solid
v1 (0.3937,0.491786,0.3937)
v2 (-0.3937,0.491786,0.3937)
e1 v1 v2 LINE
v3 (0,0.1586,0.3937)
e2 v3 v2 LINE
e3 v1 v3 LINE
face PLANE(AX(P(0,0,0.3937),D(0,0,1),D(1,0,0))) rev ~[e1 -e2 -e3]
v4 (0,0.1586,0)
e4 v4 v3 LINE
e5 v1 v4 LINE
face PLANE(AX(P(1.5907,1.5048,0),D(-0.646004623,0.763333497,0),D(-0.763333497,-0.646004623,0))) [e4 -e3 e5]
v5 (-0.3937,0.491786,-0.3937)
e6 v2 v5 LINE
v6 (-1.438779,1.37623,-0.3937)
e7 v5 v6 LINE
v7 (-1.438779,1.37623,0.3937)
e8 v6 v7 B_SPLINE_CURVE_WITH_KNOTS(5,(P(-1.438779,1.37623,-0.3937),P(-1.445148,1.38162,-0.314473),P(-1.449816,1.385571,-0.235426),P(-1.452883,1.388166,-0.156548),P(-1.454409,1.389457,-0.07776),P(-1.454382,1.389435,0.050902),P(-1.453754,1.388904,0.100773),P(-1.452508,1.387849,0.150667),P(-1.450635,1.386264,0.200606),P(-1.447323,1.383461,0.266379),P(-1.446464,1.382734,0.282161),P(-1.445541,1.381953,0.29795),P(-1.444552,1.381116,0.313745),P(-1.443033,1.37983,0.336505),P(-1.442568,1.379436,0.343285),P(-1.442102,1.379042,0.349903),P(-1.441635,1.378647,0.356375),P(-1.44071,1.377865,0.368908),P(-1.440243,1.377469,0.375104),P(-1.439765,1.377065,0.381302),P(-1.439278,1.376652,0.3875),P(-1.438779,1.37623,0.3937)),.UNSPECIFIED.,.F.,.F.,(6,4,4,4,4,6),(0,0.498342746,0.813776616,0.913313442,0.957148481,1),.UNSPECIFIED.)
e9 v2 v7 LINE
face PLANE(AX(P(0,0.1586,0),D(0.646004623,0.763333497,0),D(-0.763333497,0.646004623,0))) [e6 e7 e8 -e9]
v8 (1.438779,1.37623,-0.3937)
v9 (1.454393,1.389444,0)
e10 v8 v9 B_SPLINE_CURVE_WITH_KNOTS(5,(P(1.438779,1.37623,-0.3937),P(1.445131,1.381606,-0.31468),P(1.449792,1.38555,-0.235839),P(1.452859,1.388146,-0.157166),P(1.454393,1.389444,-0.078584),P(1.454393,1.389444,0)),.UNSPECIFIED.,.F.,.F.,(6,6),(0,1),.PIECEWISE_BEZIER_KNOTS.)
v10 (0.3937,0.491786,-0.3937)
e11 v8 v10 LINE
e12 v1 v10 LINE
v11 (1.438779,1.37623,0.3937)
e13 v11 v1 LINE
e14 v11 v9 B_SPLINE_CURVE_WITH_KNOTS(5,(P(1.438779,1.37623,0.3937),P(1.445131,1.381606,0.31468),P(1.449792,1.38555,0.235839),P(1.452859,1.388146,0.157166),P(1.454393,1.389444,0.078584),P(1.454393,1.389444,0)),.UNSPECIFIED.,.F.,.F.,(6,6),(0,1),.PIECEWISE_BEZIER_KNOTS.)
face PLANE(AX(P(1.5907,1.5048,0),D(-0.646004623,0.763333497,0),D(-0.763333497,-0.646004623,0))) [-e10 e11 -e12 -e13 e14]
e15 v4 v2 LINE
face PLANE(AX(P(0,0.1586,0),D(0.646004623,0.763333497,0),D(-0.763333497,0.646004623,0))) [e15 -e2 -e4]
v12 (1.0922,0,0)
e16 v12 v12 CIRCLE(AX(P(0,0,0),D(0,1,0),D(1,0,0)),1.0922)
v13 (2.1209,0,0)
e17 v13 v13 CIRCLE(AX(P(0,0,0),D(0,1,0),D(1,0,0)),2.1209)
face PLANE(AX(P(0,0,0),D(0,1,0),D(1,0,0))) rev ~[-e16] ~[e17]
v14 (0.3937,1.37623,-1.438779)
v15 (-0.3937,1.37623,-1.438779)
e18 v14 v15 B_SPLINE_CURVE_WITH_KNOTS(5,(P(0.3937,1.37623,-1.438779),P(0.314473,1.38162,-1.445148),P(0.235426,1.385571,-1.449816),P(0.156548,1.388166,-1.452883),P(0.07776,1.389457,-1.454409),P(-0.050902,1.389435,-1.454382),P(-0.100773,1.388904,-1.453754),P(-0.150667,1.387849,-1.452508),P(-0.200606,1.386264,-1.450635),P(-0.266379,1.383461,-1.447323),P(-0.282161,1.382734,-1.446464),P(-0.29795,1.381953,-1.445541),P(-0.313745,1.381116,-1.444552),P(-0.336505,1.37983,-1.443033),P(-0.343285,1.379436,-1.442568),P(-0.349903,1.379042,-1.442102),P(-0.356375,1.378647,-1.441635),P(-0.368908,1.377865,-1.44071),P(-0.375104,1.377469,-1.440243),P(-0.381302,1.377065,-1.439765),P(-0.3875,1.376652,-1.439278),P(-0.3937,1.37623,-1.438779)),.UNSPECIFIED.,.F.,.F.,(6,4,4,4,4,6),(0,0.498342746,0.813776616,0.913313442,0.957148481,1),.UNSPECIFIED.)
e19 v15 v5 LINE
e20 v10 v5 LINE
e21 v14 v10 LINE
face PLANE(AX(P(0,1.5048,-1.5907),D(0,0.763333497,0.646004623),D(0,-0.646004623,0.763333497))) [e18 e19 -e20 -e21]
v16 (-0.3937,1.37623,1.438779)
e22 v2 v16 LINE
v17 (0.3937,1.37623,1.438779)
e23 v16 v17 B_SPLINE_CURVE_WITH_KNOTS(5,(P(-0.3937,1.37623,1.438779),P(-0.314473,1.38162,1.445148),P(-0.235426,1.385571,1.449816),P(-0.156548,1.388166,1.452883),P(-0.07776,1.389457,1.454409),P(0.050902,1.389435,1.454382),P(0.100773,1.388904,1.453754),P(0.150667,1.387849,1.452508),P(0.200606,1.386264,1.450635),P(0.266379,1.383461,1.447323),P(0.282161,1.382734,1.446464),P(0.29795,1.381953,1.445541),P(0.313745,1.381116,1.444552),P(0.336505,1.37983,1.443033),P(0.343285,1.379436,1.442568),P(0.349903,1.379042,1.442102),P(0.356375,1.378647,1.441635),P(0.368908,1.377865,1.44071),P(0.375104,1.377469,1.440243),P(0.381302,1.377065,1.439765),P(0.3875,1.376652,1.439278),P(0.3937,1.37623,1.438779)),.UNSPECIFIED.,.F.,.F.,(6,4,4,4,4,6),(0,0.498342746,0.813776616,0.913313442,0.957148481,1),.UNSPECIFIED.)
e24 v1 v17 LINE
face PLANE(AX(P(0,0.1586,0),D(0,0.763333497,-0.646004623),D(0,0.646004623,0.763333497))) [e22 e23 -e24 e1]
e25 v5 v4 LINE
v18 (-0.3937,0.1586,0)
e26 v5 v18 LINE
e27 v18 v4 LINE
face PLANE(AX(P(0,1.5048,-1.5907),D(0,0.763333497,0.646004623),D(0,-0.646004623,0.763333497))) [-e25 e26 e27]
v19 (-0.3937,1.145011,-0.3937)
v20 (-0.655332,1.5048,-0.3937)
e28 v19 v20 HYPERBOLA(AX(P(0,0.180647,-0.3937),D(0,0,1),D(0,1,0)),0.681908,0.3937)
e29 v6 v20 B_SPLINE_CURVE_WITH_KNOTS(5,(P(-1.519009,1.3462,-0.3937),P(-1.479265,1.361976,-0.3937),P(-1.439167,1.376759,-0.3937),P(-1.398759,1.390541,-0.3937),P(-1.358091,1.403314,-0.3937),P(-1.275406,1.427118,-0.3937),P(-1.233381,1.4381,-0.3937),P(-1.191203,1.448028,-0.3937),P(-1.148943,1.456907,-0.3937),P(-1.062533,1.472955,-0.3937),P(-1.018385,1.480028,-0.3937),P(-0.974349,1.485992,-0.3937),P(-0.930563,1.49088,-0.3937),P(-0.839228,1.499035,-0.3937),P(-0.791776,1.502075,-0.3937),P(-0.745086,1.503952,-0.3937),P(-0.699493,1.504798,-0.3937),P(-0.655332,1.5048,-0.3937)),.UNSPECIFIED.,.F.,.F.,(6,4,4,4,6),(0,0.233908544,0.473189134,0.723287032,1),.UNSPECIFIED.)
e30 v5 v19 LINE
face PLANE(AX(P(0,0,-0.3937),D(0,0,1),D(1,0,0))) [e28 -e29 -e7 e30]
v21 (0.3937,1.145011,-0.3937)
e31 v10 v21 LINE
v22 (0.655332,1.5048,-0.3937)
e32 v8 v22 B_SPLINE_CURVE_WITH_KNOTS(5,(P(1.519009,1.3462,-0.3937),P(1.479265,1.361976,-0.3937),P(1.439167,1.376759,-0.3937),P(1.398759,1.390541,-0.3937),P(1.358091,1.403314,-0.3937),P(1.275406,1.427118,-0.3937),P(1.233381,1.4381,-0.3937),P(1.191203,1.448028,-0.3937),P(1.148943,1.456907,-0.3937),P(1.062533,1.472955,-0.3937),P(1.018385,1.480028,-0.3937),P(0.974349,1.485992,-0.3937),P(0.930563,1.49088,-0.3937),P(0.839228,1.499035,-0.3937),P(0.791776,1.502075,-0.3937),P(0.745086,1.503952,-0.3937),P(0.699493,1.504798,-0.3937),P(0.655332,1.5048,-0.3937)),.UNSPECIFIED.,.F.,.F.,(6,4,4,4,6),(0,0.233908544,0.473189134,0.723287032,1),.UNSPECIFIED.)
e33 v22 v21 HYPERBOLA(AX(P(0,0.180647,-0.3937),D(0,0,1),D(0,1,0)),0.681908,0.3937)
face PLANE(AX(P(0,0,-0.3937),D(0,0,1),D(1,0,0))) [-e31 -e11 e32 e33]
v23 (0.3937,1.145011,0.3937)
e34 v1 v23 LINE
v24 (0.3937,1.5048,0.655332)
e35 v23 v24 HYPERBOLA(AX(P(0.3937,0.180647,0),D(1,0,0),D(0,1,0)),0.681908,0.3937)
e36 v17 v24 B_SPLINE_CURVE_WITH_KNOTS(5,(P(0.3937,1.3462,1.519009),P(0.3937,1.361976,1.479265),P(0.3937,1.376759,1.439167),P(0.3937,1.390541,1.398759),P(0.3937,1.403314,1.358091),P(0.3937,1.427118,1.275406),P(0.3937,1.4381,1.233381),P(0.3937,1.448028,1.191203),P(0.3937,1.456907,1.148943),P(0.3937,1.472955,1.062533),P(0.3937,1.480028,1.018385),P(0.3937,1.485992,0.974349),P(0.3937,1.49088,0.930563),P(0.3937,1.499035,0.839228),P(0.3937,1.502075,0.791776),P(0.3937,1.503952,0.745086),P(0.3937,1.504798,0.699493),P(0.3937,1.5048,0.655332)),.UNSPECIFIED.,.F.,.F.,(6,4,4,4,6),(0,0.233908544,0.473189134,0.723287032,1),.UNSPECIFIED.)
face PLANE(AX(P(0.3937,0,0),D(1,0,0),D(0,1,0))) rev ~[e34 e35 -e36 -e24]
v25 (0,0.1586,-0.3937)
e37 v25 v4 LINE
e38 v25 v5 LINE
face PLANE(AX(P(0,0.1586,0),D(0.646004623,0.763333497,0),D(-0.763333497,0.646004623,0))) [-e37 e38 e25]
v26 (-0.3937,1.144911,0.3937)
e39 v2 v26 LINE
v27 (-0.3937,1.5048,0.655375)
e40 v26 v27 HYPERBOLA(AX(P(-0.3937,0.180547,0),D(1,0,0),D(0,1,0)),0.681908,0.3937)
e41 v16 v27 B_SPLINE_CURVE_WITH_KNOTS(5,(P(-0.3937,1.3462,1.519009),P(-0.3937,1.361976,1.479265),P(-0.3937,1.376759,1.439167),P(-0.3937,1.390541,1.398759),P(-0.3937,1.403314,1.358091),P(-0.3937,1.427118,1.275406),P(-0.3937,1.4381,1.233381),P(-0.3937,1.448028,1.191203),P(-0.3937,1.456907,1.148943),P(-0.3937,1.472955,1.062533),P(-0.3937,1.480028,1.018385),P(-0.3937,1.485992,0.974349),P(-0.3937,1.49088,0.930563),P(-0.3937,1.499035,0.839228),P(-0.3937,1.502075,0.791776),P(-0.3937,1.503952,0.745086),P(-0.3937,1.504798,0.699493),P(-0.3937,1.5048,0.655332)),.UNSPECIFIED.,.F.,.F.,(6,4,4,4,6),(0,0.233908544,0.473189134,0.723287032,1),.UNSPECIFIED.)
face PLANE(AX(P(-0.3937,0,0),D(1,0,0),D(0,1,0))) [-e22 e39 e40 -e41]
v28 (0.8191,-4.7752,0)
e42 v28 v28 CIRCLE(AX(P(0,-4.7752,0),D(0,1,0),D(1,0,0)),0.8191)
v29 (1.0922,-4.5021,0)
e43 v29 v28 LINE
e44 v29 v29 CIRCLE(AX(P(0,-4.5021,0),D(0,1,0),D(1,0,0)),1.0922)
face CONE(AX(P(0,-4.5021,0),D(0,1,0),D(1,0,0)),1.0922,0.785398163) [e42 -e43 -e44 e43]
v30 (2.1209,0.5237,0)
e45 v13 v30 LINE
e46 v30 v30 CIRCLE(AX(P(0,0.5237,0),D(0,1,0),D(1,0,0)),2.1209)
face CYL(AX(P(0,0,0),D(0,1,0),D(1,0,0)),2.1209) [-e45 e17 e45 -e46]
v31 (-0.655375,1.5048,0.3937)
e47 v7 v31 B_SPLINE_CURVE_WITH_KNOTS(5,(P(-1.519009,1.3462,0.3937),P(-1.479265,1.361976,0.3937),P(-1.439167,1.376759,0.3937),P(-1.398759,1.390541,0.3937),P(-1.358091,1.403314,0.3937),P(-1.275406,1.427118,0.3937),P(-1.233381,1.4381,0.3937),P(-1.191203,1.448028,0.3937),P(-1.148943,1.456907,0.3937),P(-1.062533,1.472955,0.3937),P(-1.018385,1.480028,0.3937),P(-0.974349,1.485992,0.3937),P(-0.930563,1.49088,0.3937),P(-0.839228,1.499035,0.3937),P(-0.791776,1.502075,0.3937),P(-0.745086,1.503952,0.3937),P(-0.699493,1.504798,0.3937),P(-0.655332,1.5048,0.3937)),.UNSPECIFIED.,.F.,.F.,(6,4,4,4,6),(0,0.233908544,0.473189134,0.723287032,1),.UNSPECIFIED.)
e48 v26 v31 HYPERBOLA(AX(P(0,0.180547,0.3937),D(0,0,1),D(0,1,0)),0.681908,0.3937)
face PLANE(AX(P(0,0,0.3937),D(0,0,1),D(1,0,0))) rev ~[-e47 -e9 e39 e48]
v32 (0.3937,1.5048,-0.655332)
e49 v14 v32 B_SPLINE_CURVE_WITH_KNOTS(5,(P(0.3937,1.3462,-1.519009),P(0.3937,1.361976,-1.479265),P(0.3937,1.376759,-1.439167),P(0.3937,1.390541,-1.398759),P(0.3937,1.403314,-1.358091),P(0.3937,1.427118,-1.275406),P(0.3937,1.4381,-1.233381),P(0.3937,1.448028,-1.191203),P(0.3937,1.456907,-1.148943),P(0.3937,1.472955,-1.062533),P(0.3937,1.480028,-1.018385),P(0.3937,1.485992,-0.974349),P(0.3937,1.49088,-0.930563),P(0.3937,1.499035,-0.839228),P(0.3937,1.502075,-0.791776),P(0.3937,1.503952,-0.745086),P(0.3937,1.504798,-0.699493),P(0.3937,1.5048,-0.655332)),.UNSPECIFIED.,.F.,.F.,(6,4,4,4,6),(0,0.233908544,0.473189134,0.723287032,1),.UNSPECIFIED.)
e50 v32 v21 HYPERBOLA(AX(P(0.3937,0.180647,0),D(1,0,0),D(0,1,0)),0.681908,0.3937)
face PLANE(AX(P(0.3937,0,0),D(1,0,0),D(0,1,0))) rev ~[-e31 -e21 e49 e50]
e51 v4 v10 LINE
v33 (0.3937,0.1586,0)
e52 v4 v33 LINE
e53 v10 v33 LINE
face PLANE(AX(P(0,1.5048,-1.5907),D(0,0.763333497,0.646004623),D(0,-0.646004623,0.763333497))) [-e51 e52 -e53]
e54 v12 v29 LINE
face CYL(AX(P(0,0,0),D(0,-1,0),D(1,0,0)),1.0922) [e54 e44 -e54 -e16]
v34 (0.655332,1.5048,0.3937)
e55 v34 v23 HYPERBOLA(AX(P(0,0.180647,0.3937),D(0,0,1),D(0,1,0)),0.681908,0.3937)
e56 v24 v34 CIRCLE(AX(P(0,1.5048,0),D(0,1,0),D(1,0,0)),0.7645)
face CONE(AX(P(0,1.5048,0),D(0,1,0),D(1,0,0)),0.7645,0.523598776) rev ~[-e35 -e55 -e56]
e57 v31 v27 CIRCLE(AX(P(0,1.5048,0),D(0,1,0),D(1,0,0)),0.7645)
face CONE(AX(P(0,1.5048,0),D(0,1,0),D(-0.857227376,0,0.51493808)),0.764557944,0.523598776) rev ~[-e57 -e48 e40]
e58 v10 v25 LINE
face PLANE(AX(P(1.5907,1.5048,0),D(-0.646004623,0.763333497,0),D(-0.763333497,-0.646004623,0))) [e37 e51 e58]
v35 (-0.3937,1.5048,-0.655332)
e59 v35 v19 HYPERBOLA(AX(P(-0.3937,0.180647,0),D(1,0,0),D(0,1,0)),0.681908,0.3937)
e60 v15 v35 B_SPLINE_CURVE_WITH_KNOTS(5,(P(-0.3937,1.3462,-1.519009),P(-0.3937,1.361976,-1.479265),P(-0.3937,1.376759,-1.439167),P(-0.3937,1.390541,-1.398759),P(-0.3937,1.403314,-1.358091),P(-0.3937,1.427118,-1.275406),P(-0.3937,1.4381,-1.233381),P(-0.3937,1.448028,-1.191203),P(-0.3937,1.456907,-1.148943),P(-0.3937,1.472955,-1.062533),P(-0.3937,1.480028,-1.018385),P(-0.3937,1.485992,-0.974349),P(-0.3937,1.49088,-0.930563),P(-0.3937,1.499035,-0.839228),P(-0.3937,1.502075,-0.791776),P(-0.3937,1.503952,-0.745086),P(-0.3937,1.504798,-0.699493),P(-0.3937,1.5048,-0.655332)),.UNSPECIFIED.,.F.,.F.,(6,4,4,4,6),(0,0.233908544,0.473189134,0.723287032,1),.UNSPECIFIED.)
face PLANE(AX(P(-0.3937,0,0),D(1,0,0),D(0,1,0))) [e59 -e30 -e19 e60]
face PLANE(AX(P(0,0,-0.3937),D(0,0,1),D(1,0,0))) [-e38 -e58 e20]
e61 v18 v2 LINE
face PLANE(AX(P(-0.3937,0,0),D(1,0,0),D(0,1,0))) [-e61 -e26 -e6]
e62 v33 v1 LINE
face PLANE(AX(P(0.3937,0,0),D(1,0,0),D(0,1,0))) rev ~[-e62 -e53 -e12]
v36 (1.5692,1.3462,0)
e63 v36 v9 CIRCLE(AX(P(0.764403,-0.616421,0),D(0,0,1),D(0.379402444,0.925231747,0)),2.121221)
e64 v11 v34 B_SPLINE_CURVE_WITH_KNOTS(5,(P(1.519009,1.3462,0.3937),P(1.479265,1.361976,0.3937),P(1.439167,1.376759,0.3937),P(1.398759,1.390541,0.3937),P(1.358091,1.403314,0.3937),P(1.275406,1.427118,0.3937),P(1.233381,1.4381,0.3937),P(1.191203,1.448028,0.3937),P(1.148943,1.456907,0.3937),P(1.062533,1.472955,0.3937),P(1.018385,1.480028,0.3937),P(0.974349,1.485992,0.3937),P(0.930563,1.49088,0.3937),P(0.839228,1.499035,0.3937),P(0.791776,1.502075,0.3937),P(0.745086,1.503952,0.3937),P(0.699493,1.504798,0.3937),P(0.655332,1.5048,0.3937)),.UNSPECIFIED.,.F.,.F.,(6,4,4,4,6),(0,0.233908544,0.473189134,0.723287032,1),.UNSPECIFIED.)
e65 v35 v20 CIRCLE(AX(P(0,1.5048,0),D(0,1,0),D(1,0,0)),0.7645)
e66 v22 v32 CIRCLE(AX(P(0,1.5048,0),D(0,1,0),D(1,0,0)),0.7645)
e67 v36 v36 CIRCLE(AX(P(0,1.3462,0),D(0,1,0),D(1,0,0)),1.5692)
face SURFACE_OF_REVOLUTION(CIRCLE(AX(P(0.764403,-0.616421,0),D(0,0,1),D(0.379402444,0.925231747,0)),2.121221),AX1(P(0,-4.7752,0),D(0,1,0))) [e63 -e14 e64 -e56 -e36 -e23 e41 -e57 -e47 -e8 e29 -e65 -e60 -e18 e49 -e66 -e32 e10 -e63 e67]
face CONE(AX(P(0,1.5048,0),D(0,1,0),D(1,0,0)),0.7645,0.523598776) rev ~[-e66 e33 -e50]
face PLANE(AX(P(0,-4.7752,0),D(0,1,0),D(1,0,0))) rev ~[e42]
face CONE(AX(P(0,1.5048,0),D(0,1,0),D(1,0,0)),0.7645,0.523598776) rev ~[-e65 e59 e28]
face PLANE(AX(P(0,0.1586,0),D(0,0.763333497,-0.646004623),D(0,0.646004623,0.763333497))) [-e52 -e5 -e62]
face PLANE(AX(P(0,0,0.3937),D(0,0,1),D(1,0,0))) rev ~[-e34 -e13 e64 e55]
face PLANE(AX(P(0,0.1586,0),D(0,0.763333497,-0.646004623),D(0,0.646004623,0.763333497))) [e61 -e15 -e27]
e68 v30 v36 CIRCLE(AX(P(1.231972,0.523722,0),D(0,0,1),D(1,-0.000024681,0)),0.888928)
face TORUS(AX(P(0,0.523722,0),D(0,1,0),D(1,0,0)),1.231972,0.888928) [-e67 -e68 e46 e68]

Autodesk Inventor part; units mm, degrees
ref_plane "YZ Plane" through (0, 0, 0) normal (1, 0, 0) x (0, 1, 0)
ref_plane "XZ Plane" through (0, 0, 0) normal (0, 1, 0) x (-1, 0, 0)
ref_plane "XY Plane" through (0, 0, 0) normal (0, 0, 1) x (1, 0, 0)
sketch "Sketch1" plane through (0, 0, 0) normal (0, 0, 1) x (1, 0, 0)
  line L0 (0, -5.4574) -> (0, 4.0933) projected
  line L1 (2.1209, 0) -> (2.1209, 0.5237)
  arc A0 (2.1209, 0.5237) -> (1.5692, 1.3462) centre (1.2319, 0.5237) ccw
  arc A1 (1.5692, 1.3462) -> (0.7645, 1.5048) centre (0.7645, -0.6161) ccw
  line L2 (0.7645, 1.5048) -> (0, 1.5048)
  line L3 (2.1209, 0) -> (1.0922, 0)
  line L4 (1.0922, 0) -> (1.0922, -4.7752)
  line L5 (1.0922, -4.7752) -> (0, -4.7752)
  point P0 (0, 0)
  dimension "d0" = 2.1844
  dimension "d1" = 4.2418
  dimension "d2" = 0.889
  dimension "d3" = 2.1209
  dimension "d4" = 4.7752
  dimension "d6" = 1.5291
  dimension "d8" = 1.3462
revolve "Revolution1" add sketch "Sketch1" angle 360 about axis through (0, -10, 0) along (0, 1, 0)
sketch "Sketch2" plane through (0, 0, 0) normal (0, 0, 1) x (1, 0, 0)
  line L0 (0, 0.1586) -> (-1.5907, 1.5048)
  line L1 (-1.5907, 1.5048) -> (1.5907, 1.5048)
  line L2 (1.5907, 1.5048) -> (0, 0.1586)
  line L3 (0, 0.0835) -> (0, 2.5016) projected
  line L4 (-0.7645, 1.5048) -> (0.7645, 1.5048) projected
  dimension "d9" = 3.1814
  dimension "d22" = 1.3462
extrude "Extrusion1" cut sketch "Sketch2" against normal mid plane 0.7874
sketch "Sketch3" plane through (0, 0, 0) normal (1, 0, 0) x (0, 1, 0)
  line L0 (1.5048, 1.5907) -> (1.5048, -1.5907)
  line L1 (1.5048, -1.5907) -> (0.1586, 0)
  line L2 (0.1586, 0) -> (1.5048, 1.5907)
  point P0 (1.5048, 0)
  point P1 (1.5048, 0)
  point P2 (1.5048, 0)
  dimension "d12" = 3.1814
extrude "Extrusion2" cut sketch "Sketch3" against normal mid plane 0.7874
sketch "Sketch4" plane through (-0.6554, 1.5048, 0.3937) normal (0, 1, 0) x (1, 0, 0)
  arc A0 (0, 0) -> (0.2617, -0.2617) centre (0.6554, 0.3937) ccw projected
  circle A1 centre (0.6554, 0.3937) radius 0.7645
  dimension "d17" = 1.5291
extrude "Extrusion3" cut sketch "Sketch4" against normal blind 0.7645 draft -30
thread "Thread1" size "2-56 UNC" class "2A" standard "ANSI Unified Screw Threads" length 4.5466
chamfer "Chamfer1" distance 0.2731 angle 45 1 edges at (-1.0922, -4.7752, 0)
equation "\"d0\" = Dia"
equation "\"d1\" = HeadDia"
equation "\"d2\" = HeadRad"
equation "\"d3\" = 0.5 * d1"
equation "\"d4\" = ShankLength"
equation "\"d6\" = 0.7 * d0"
equation "\"d8\" = HeadHeight"
equation "\"d9\" = 0.75 * d1"
equation "\"d22\" = HeadHeight"
equation "\"d10\" = SlotW"
equation "\"d12\" = d9"
equation "\"d13\" = SlotW"
equation "\"d17\" = d6"
equation "\"d15\" = 0.5 * d6"
equation "\"d18\" = ThreadLength"
equation "\"d20\" = 0.125 * Dia"
equation "\"d21\" = 0.125 * Dia"
equation "\"Dia\" = 2.1844"
equation "\"ShankLength\" = 4.7752"
equation "\"HeadDia\" = 4.2418"
equation "\"HeadRad\" = 0.889"
equation "\"SlotW\" = 0.7874"
equation "\"SlotD\" = 0.7874"
equation "\"HeadHeight\" = 1.3462"
equation "\"ThreadLength\" = 4.5466"
properties part number "Phillips Pan Head Machine Screw Inch" material "Steel, High Strength Low Alloy"
